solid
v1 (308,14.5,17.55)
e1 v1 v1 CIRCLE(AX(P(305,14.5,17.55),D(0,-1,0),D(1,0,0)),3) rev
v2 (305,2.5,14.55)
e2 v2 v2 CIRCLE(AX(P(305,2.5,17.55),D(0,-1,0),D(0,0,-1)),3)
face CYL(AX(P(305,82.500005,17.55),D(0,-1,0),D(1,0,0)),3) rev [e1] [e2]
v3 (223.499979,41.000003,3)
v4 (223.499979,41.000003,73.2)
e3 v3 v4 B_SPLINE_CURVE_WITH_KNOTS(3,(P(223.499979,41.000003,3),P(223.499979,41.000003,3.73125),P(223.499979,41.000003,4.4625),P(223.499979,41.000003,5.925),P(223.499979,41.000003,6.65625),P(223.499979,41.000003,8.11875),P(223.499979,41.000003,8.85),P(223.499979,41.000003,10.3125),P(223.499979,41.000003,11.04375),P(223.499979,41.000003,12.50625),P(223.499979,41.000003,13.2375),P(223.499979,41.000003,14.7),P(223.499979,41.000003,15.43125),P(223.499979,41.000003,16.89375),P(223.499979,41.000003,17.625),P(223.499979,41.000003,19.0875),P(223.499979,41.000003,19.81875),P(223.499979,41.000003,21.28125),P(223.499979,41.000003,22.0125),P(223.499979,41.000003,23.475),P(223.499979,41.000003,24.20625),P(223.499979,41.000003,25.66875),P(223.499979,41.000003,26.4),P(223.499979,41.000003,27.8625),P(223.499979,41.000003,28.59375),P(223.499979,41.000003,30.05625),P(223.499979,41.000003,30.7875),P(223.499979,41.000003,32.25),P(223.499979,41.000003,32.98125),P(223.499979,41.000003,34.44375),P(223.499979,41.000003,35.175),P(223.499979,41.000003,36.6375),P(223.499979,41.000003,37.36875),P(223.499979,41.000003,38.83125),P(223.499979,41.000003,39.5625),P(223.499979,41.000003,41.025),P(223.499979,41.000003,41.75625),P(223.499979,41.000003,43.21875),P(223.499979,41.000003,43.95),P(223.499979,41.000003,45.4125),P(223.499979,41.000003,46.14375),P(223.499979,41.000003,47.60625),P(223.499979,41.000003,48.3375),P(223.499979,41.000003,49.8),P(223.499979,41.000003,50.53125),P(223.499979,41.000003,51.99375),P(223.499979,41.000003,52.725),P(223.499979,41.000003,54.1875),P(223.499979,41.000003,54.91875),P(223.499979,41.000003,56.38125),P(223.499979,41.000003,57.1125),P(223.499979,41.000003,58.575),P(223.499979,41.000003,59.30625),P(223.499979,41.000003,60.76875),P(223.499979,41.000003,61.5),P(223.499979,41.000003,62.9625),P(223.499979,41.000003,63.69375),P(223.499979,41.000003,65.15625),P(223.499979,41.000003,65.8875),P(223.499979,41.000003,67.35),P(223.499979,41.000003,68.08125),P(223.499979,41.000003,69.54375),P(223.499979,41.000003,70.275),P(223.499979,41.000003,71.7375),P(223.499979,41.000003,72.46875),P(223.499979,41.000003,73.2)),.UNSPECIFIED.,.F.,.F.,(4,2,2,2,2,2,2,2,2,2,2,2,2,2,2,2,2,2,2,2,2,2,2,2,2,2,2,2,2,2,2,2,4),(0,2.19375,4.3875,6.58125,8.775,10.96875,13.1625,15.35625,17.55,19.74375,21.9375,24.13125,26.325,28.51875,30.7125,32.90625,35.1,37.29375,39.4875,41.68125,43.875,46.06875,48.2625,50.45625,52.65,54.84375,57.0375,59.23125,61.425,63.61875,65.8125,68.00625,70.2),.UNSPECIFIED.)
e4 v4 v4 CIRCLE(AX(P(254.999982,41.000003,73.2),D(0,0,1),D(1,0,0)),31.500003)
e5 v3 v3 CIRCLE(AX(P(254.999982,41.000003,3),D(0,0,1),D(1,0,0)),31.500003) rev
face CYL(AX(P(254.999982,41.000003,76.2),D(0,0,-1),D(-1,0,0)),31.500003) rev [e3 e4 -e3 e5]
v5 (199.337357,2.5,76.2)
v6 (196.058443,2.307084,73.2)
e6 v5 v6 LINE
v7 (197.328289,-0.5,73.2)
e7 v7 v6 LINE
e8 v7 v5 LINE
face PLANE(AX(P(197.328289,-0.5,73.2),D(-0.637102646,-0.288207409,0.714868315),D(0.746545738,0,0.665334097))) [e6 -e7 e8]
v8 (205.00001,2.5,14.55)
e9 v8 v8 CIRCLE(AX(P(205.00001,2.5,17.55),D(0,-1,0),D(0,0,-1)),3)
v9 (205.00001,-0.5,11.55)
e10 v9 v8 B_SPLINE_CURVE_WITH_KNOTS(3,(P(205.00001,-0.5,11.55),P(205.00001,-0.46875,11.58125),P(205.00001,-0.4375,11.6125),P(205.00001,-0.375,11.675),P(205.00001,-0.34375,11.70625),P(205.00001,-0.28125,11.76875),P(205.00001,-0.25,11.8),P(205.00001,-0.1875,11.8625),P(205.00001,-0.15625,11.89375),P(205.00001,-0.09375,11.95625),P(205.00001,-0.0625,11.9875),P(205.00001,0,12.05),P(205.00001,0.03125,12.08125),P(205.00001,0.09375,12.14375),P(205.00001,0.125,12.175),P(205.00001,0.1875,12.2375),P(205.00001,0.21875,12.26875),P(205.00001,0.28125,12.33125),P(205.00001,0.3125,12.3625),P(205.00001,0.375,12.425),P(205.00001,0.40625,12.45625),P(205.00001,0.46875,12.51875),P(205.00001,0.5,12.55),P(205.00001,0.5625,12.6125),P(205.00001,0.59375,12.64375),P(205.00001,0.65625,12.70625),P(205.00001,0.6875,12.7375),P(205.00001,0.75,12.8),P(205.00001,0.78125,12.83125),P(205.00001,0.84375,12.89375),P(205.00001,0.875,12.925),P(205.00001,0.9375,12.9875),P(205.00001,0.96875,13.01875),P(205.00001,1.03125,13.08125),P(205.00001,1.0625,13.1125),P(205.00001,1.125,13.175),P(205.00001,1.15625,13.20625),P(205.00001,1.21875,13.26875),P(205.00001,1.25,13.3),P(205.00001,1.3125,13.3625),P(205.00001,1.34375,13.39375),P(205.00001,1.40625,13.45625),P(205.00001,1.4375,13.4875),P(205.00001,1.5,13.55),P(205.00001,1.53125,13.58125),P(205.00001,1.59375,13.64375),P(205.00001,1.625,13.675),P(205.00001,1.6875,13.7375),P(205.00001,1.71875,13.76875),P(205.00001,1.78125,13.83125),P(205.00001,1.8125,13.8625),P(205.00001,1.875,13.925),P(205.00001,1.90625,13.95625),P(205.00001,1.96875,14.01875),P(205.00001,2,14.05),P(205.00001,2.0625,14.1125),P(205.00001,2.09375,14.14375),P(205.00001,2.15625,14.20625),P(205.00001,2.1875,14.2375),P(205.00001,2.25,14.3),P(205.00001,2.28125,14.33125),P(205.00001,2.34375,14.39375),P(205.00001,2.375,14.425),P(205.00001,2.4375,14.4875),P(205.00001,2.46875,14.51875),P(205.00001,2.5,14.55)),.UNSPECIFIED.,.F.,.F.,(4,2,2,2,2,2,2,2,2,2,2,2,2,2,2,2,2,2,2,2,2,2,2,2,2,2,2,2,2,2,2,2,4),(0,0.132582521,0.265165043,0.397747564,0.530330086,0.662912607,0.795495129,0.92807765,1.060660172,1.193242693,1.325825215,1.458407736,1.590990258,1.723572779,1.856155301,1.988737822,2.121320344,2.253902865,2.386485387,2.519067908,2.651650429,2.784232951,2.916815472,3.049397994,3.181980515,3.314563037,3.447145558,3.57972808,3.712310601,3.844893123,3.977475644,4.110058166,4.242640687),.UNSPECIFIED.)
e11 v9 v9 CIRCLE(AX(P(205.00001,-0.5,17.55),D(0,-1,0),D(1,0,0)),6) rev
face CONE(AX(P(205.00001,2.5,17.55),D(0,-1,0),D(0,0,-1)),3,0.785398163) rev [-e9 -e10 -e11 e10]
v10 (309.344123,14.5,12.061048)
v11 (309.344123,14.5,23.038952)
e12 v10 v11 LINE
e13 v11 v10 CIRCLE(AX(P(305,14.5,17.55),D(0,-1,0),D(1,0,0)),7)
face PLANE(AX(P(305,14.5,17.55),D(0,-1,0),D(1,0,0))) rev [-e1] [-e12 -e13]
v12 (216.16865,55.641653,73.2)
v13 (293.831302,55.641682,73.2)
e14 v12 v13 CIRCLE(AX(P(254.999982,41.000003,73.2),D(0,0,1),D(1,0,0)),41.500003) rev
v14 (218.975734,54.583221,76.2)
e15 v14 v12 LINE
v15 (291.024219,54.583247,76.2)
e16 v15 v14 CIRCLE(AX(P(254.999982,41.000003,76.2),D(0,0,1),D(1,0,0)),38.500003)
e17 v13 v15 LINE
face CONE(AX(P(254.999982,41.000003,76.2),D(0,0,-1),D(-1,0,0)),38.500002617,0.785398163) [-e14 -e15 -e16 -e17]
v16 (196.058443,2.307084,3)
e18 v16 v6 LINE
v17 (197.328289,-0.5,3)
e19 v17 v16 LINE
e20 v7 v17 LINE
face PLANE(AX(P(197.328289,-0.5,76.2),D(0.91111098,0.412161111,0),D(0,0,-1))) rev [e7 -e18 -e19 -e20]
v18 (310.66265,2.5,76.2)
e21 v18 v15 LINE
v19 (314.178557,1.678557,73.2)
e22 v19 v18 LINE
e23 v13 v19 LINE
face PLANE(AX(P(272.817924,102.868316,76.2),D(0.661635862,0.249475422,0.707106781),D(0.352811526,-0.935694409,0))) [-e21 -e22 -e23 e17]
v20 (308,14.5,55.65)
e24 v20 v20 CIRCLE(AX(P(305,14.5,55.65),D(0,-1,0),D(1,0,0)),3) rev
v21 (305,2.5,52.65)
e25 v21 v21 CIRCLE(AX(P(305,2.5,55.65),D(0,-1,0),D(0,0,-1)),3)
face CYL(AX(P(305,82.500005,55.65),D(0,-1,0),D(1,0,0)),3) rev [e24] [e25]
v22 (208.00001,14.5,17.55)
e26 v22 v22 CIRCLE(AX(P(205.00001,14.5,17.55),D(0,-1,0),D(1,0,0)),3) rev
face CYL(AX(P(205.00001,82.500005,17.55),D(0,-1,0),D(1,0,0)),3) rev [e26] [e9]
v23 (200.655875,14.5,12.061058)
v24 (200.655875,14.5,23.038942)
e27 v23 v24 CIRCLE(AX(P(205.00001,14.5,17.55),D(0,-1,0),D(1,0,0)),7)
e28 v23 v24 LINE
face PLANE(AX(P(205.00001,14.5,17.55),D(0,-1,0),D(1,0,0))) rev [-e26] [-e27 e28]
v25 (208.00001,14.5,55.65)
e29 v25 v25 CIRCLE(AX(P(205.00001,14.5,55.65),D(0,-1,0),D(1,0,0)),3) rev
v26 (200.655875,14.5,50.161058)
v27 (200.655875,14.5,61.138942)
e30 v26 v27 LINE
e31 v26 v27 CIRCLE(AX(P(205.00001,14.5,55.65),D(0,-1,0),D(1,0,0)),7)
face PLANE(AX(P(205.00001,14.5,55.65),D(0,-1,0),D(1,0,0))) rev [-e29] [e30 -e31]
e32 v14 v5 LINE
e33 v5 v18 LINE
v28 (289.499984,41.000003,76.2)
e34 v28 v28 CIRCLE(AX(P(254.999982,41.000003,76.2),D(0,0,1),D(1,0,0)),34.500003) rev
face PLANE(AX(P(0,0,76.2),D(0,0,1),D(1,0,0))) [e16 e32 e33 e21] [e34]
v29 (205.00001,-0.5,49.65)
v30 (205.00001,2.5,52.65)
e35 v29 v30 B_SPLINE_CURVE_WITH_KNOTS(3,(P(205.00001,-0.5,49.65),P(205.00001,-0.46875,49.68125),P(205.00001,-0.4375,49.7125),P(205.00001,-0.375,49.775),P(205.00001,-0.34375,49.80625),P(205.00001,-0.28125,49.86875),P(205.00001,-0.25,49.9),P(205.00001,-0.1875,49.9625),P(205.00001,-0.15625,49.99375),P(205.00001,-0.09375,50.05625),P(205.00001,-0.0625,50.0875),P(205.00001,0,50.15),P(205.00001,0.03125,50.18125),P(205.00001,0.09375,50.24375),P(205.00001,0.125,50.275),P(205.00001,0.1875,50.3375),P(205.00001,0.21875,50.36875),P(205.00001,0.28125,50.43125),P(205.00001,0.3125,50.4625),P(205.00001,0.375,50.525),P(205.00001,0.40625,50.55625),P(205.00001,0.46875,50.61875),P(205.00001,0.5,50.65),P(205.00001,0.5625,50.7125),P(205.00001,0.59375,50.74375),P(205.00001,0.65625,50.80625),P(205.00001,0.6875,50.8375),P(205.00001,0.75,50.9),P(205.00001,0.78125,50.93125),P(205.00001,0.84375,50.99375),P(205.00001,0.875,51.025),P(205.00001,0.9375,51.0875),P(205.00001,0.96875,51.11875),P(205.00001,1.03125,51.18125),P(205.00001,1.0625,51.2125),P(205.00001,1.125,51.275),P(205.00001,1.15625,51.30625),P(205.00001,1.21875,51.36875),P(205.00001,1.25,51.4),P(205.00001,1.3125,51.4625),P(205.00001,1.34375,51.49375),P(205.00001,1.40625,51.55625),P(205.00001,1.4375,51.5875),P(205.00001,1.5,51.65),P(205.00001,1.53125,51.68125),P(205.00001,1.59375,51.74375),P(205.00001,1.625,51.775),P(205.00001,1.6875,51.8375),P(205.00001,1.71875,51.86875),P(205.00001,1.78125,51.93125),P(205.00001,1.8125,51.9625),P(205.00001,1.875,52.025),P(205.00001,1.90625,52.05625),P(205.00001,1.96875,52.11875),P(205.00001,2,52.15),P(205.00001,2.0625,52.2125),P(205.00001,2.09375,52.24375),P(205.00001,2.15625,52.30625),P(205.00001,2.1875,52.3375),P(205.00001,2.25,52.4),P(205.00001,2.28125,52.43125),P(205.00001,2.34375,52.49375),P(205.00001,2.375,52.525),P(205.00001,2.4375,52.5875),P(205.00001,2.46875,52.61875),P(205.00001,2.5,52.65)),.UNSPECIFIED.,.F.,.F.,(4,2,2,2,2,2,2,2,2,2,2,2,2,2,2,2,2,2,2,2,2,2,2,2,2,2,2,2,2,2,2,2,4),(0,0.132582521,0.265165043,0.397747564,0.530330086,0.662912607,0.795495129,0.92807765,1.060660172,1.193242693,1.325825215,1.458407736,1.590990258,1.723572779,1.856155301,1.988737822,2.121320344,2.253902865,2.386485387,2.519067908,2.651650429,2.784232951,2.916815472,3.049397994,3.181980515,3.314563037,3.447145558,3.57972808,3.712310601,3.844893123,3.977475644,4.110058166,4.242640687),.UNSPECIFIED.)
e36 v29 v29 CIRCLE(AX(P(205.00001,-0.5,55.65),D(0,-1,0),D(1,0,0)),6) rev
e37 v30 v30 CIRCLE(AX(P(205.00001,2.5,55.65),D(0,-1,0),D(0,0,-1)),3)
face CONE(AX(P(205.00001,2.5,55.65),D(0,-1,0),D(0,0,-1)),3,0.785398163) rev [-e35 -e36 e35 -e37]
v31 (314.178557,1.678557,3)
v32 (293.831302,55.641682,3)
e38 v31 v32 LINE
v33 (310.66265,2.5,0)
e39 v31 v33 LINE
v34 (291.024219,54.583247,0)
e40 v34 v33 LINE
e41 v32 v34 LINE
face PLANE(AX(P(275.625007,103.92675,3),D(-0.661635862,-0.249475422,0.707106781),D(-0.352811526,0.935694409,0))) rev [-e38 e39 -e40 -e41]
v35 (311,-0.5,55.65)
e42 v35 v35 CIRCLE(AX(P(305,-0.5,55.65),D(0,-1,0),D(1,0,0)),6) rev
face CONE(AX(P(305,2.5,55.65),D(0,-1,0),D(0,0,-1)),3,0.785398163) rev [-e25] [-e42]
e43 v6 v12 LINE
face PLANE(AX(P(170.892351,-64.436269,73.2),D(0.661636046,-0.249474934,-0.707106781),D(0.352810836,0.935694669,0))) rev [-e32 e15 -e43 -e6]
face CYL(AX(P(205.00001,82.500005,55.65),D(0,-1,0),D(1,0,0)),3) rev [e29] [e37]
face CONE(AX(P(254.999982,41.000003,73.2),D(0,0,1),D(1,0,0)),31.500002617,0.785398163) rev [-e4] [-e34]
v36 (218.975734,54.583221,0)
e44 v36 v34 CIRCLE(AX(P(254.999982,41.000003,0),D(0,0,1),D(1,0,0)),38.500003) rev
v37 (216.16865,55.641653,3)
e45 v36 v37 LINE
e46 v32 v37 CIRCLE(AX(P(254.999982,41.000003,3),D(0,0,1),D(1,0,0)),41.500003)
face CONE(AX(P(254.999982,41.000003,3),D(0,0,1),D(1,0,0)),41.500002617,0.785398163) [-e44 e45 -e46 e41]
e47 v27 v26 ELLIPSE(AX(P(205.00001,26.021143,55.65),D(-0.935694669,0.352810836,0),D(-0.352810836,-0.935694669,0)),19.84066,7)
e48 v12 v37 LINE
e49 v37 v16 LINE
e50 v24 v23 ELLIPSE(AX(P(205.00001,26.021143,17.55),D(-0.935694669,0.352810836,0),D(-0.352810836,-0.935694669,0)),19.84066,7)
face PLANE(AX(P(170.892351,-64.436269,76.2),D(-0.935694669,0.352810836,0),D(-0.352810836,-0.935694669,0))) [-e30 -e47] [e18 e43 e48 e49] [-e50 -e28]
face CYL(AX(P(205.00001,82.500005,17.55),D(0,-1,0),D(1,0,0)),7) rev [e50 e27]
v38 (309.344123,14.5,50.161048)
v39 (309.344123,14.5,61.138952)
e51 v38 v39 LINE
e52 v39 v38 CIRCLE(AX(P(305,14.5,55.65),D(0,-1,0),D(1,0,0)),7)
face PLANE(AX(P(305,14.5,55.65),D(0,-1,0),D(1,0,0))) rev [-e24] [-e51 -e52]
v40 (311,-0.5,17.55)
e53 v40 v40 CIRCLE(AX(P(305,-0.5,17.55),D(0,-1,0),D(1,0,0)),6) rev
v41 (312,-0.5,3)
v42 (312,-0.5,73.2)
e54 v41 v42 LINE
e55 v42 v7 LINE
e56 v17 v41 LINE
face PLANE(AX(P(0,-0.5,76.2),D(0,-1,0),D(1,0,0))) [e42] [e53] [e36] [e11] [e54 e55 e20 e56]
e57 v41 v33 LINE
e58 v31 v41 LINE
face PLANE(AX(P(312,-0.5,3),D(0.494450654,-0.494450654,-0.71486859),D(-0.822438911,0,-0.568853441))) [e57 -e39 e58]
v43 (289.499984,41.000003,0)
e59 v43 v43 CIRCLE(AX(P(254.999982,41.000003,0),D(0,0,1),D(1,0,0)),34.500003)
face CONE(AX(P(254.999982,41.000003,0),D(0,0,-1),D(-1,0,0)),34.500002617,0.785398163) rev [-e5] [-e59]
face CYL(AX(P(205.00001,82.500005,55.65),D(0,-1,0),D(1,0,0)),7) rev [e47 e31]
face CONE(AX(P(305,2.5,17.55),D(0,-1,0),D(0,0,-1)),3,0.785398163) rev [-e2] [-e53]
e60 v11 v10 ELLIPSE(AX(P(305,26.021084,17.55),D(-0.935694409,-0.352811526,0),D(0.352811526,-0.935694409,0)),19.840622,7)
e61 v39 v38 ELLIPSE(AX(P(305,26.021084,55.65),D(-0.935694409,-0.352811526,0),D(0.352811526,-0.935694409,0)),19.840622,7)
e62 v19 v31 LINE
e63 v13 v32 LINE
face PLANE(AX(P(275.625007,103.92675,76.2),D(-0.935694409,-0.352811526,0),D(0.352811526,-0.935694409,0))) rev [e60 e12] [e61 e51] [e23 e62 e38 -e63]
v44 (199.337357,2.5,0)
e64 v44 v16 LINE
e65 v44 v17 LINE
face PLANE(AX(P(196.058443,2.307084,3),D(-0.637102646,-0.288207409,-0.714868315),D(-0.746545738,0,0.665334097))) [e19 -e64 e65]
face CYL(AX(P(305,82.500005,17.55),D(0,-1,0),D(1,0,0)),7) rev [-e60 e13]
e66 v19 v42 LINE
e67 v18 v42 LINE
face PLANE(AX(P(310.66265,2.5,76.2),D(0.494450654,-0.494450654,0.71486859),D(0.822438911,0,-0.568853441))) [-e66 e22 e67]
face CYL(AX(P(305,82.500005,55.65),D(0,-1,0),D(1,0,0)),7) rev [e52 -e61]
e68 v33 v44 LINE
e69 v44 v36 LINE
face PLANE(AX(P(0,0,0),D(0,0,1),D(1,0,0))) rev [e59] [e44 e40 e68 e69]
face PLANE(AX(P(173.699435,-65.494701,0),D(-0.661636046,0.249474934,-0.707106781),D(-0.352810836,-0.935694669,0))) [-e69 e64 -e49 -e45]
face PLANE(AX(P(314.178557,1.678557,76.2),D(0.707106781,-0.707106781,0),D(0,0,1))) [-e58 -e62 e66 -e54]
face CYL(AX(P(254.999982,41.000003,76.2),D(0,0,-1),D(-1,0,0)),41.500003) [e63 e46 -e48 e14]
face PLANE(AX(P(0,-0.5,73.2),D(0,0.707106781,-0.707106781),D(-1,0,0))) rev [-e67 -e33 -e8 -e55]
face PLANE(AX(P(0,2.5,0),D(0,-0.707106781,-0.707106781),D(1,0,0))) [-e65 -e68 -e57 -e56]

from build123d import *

# Parameters (mm, degrees)
SKETCH1_R           = 31.500002617
BOSS_EXTRUDE1_DEPTH = 76.2
SKETCH2_R           = 3
CUT_EXTRUDE1_DEPTH  = 335.545125332
SKETCH3_R           = 7
CUT_EXTRUDE2_DEPTH  = 332.142628978


with BuildPart() as part:
    # Sketch1 → Boss-Extrude1 (new body)
    with BuildSketch(Plane.XY):
        with BuildLine():
            Line((254.999981536, -0.500000028), (315.000000023, -0.500000028))
            Line((315.000000023, -0.500000028), (293.831301967, 55.641681824))
            ThreePointArc((293.831301967, 55.641681824), (254.99996624, 82.500005207), (216.168650312, 55.6416532))
            Line((216.168650312, 55.6416532), (195.000010316, -0.500000028))
            Line((195.000010316, -0.500000028), (254.999981536, -0.500000028))
        make_face()
        with Locations(Location((254.999981536, 41.00000259, 0), (0, 0, 180))):
            Circle(SKETCH1_R, mode=Mode.SUBTRACT)
    extrude(amount=BOSS_EXTRUDE1_DEPTH)

    # Sketch2 → Cut-Extrude1 (cut, through all)
    with BuildSketch(Plane.XZ.offset(0.500000028)):
        with Locations((205.000010316, 55.65)):
            Circle(SKETCH2_R)
        with Locations((205.000010316, 17.55)):
            Circle(SKETCH2_R)
        with Locations((305.000000023, 17.55)):
            Circle(SKETCH2_R)
        with Locations((305.000000023, 55.65)):
            Circle(SKETCH2_R)
    extrude(amount=-CUT_EXTRUDE1_DEPTH, mode=Mode.SUBTRACT)

    # Sketch3 → Cut-Extrude2 (cut, through all)
    with BuildSketch(Plane(origin=(0, 14.499999972, 0), x_dir=(-1, 0, 0), z_dir=(0, -1, 0))):
        with Locations((-205.000010316, -55.65)):
            Circle(SKETCH3_R)
        with Locations((-205.000010316, -17.55)):
            Circle(SKETCH3_R)
        with Locations((-305.000000023, -17.55)):
            Circle(SKETCH3_R)
        with Locations((-305.000000023, -55.65)):
            Circle(SKETCH3_R)
    extrude(amount=-CUT_EXTRUDE2_DEPTH, mode=Mode.SUBTRACT)

    # Chamfer1
    # the kernel refuses this chamfer: 3, 2.32827876, 2.328277984 mm, written as the material it takes off along each edge
    with BuildSketch(Plane(origin=(312.2804021, 1.226185537, 2), x_dir=(0.7489750456743214, -0.1749877092594348, 0.6390740822199596), z_dir=(0.49445065392204135, -0.49445065392203297, -0.7148685904920845))) as chamfer1_piece_1:
        Polygon((-2.712706316, -0.938589866), (1.981585134, -0.938589866), (0.731121181, 1.877179732), align=None)
    extrude(amount=3.990753507, mode=Mode.SUBTRACT)
    with BuildSketch(Plane(origin=(312.2804021, 1.226185537, 74.2), x_dir=(0.7489750456743212, -0.17498770925943466, -0.6390740822199599), z_dir=(0.49445065392204157, -0.4944506539220329, 0.7148685904920844))) as chamfer1_piece_2:
        Polygon((-2.712706316, 0.938589866), (1.981585134, 0.938589866), (0.731121181, -1.877179732), align=None)
    extrude(amount=3.990753507, mode=Mode.SUBTRACT)
    with BuildSketch(Plane(origin=(197.57469642, 1.435694642, 2), x_dir=(-0.7370953833685595, -0.043367244138400055, 0.6743957873182457), z_dir=(-0.6371026460751021, -0.2882074086415896, -0.7148683151239834))) as chamfer1_piece_3:
        Polygon((-2.694196805, 0.990466053), (1.754229559, 0.990466053), (0.939967246, -1.980932106), align=None)
    extrude(amount=3.990753255, mode=Mode.SUBTRACT)
    with BuildSketch(Plane(origin=(197.57469642, 1.435694642, 74.2), x_dir=(0.4121611112794653, -0.9111109802591978, 0), z_dir=(-0.637102646075102, -0.2882074086415896, 0.7148683151239834))) as chamfer1_piece_4:
        Polygon((-1.418873162, -1.430085067), (1.662073143, -1.430085067), (-0.243199981, 2.860170134), align=None)
    extrude(amount=3.990753255, mode=Mode.SUBTRACT)
    with BuildSketch(Plane(origin=(315.000000023, -0.500000028, -7.715048964), x_dir=(-0.9996219169112968, -0.027495876610586858, 0), z_dir=(0, 0, 1))) as chamfer1_piece_5:
        with BuildLine():
            Line((3.086019586, 0), (0.674077573, -2.282806951))
            Line((0.674077573, -2.282806951), (0.617375083, -2.302423975))
            ThreePointArc((0.617375083, -2.302423975), (0.331998575, -1.143147207), (-0.05670249, -0.019617024))
            Line((-0.05670249, -0.019617024), (0.001649753, 0.059977315))
            ThreePointArc((0.001649753, 0.059977315), (1.543492994, 0.017566949), (3.087669338, 0.059977315))
            Line((3.087669338, 0.059977315), (3.086019586, 0))
        make_face()
    extrude(amount=91.630097928, mode=Mode.SUBTRACT)
    with BuildSketch(Plane(origin=(195.000010316, -0.500000028, -7.715048964), x_dir=(0.9989444981358719, -0.04593353507048098, 0), z_dir=(0, 0, 1))) as chamfer1_piece_6:
        with BuildLine():
            Line((2.380250452, 0), (0.873946844, 2.959684746))
            Line((0.873946844, 2.959684746), (0.81689207, 2.978252267))
            ThreePointArc((0.81689207, 2.978252267), (0.420262466, 1.485280674), (-0.057054773, 0.018567521))
            Line((-0.057054773, 0.018567521), (0.002756012, -0.05993667))
            ThreePointArc((0.002756012, -0.05993667), (1.190370205, -0.005327712), (2.383006464, -0.05993667))
            Line((2.383006464, -0.05993667), (2.380250452, 0))
        make_face()
    extrude(amount=91.630097928, mode=Mode.SUBTRACT)
    with BuildSketch(Plane(origin=(317.721958218, -7.71892821, 76.2), x_dir=(-0.9353406389810182, -0.3526781334871724, 0.027495876610586882), z_dir=(-0.3528115255584857, 0.9356944092133361, 0))) as chamfer1_piece_7:
        with BuildLine():
            Line((3.086019586, 0), (-0.169641465, -3.081353381))
            Line((-0.169641465, -3.081353381), (-0.22961878, -3.079703628))
            ThreePointArc((-0.22961878, -3.079703628), (-0.102387681, -1.540193489), (-0.059977315, 0.001649753))
            Line((-0.059977315, 0.001649753), (0.001649753, 0.059977315))
            ThreePointArc((0.001649753, 0.059977315), (1.543492994, 0.017566949), (3.087669338, 0.059977315))
            Line((3.087669338, 0.059977315), (3.086019586, 0))
        make_face()
    extrude(amount=67.715067451, mode=Mode.SUBTRACT)
    with BuildSketch(Plane(origin=(254.999981536, 41.00000259, 76.2), x_dir=(0.9356944092133357, 0.3528115255584864, 0), z_dir=(0.3528115255584864, -0.9356944092133357, 0))) as chamfer1_piece_8:
        with BuildLine():
            Line((41.584855431, -3.084852814), (38.415149803, 0.084852814))
            Line((38.415149803, 0.084852814), (38.415149803, 0.144852814))
            ThreePointArc((38.415149803, 0.144852814), (39.95757621, 0.06), (41.500002617, 0.06))
            Line((41.500002617, 0.06), (41.560002617, 0))
            ThreePointArc((41.560002617, 0), (41.560002617, -1.542426407), (41.644855431, -3.084852814))
            Line((41.644855431, -3.084852814), (41.584855431, -3.084852814))
        make_face()
    revolve(axis=Axis((254.999981536, 41.00000259, 76.2), (0, 0, 1)), revolution_arc=138.681287603, mode=Mode.SUBTRACT)
    with BuildSketch(Plane(origin=(216.168650312, 55.6416532, 76.2), x_dir=(0.9353408989512485, -0.3526774440171723, 0.027495876610586775), z_dir=(-0.35281083582771006, -0.9356946692818939, 0))) as chamfer1_piece_9:
        with BuildLine():
            Line((3.086019586, 0), (-0.169641465, -3.081353381))
            Line((-0.169641465, -3.081353381), (-0.22961878, -3.079703628))
            ThreePointArc((-0.22961878, -3.079703628), (-0.102387681, -1.540193489), (-0.059977315, 0.001649753))
            Line((-0.059977315, 0.001649753), (0.001649753, 0.059977315))
            ThreePointArc((0.001649753, 0.059977315), (1.543492994, 0.017566949), (3.087669338, 0.059977315))
            Line((3.087669338, 0.059977315), (3.086019586, 0))
        make_face()
    extrude(amount=67.715020184, mode=Mode.SUBTRACT)
    with BuildSketch(Plane(origin=(305.000000023, -0.500000028, 55.65), x_dir=(1, 0, 0), z_dir=(0, 0, -1))) as chamfer1_piece_10:
        with BuildLine():
            Line((6.084852814, 0.084852814), (2.915147186, -3.084852814))
            Line((2.915147186, -3.084852814), (2.855147186, -3.084852814))
            ThreePointArc((2.855147186, -3.084852814), (2.94, -1.542426407), (2.94, 0))
            Line((2.94, 0), (3, 0.06))
            ThreePointArc((3, 0.06), (4.542426407, 0.06), (6.084852814, 0.144852814))
            Line((6.084852814, 0.144852814), (6.084852814, 0.084852814))
        make_face()
    revolve(axis=Axis((305.000000023, -0.500000028, 55.65), (0, -1, 0)), mode=Mode.SUBTRACT)
    with BuildSketch(Plane(origin=(305.000000023, -0.500000028, 17.55), x_dir=(1, 0, 0), z_dir=(0, 0, -1))) as chamfer1_piece_11:
        with BuildLine():
            Line((6.084852814, 0.084852814), (2.915147186, -3.084852814))
            Line((2.915147186, -3.084852814), (2.855147186, -3.084852814))
            ThreePointArc((2.855147186, -3.084852814), (2.94, -1.542426407), (2.94, 0))
            Line((2.94, 0), (3, 0.06))
            ThreePointArc((3, 0.06), (4.542426407, 0.06), (6.084852814, 0.144852814))
            Line((6.084852814, 0.144852814), (6.084852814, 0.084852814))
        make_face()
    revolve(axis=Axis((305.000000023, -0.500000028, 17.55), (0, -1, 0)), mode=Mode.SUBTRACT)
    with BuildSketch(Plane(origin=(322.715048987, -0.500000028, 76.2), x_dir=(0, 0.9996219169112968, 0.027495876610586778), z_dir=(-1, 0, 0))) as chamfer1_piece_12:
        with BuildLine():
            Line((3.086019586, 0), (-0.169641465, 3.081353381))
            Line((-0.169641465, 3.081353381), (-0.22961878, 3.079703628))
            ThreePointArc((-0.22961878, 3.079703628), (-0.102387681, 1.540193489), (-0.059977315, -0.001649753))
            Line((-0.059977315, -0.001649753), (0.001649753, -0.059977315))
            ThreePointArc((0.001649753, -0.059977315), (1.543492994, -0.017566949), (3.087669338, -0.059977315))
            Line((3.087669338, -0.059977315), (3.086019586, 0))
        make_face()
    extrude(amount=135.430087635, mode=Mode.SUBTRACT)
    with BuildSketch(Plane(origin=(205.000010316, -0.500000028, 17.55), x_dir=(1, 0, 0), z_dir=(0, 0, -1))) as chamfer1_piece_13:
        with BuildLine():
            Line((6.084852814, 0.084852814), (2.915147186, -3.084852814))
            Line((2.915147186, -3.084852814), (2.855147186, -3.084852814))
            ThreePointArc((2.855147186, -3.084852814), (2.94, -1.542426407), (2.94, 0))
            Line((2.94, 0), (3, 0.06))
            ThreePointArc((3, 0.06), (4.542426407, 0.06), (6.084852814, 0.144852814))
            Line((6.084852814, 0.144852814), (6.084852814, 0.084852814))
        make_face()
    revolve(axis=Axis((205.000010316, -0.500000028, 17.55), (0, -1, 0)), mode=Mode.SUBTRACT)
    with BuildSketch(Plane(origin=(205.000010316, -0.500000028, 55.65), x_dir=(1, 0, 0), z_dir=(0, 0, -1))) as chamfer1_piece_14:
        with BuildLine():
            Line((6.084852814, 0.084852814), (2.915147186, -3.084852814))
            Line((2.915147186, -3.084852814), (2.855147186, -3.084852814))
            ThreePointArc((2.855147186, -3.084852814), (2.94, -1.542426407), (2.94, 0))
            Line((2.94, 0), (3, 0.06))
            ThreePointArc((3, 0.06), (4.542426407, 0.06), (6.084852814, 0.144852814))
            Line((6.084852814, 0.144852814), (6.084852814, 0.084852814))
        make_face()
    revolve(axis=Axis((205.000010316, -0.500000028, 55.65), (0, -1, 0)), mode=Mode.SUBTRACT)
    with BuildSketch(Plane(origin=(254.999981536, 41.00000259, 76.2), x_dir=(-1, 0, 0), z_dir=(0, 1, 0))) as chamfer1_piece_15:
        with BuildLine():
            Line((34.584855431, 0.084852814), (31.415149803, -3.084852814))
            Line((31.415149803, -3.084852814), (31.355149803, -3.084852814))
            ThreePointArc((31.355149803, -3.084852814), (31.440002617, -1.542426407), (31.440002617, 0))
            Line((31.440002617, 0), (31.500002617, 0.06))
            ThreePointArc((31.500002617, 0.06), (33.042429024, 0.06), (34.584855431, 0.144852814))
            Line((34.584855431, 0.144852814), (34.584855431, 0.084852814))
        make_face()
    revolve(axis=Axis((254.999981536, 41.00000259, 76.2), (0, 0, 1)), mode=Mode.SUBTRACT)
    with BuildSketch(Plane(origin=(187.284961352, -0.500000028, 0), x_dir=(0, -0.027495876610586382, 0.9996219169112968), z_dir=(1, 0, 0))) as chamfer1_piece_16:
        with BuildLine():
            Line((3.086019586, 0), (-0.169641465, -3.081353381))
            Line((-0.169641465, -3.081353381), (-0.22961878, -3.079703628))
            ThreePointArc((-0.22961878, -3.079703628), (-0.102387681, -1.540193489), (-0.059977315, 0.001649753))
            Line((-0.059977315, 0.001649753), (0.001649753, 0.059977315))
            ThreePointArc((0.001649753, 0.059977315), (1.543492994, 0.017566949), (3.087669338, 0.059977315))
            Line((3.087669338, 0.059977315), (3.086019586, 0))
        make_face()
    extrude(amount=135.430087635, mode=Mode.SUBTRACT)
    with BuildSketch(Plane(origin=(216.168650312, 55.6416532, 0), x_dir=(0.9353408989512486, -0.3526774440171724, -0.027495876610586396), z_dir=(-0.35281083582771006, -0.9356946692818939, 0))) as chamfer1_piece_17:
        with BuildLine():
            Line((3.086019586, 0), (-0.169641465, 3.081353381))
            Line((-0.169641465, 3.081353381), (-0.22961878, 3.079703628))
            ThreePointArc((-0.22961878, 3.079703628), (-0.102387681, 1.540193489), (-0.059977315, -0.001649753))
            Line((-0.059977315, -0.001649753), (0.001649753, -0.059977315))
            ThreePointArc((0.001649753, -0.059977315), (1.543492994, -0.017566949), (3.087669338, -0.059977315))
            Line((3.087669338, -0.059977315), (3.086019586, 0))
        make_face()
    extrude(amount=67.715020184, mode=Mode.SUBTRACT)
    with BuildSketch(Plane(origin=(254.999981536, 41.00000259, 0), x_dir=(0.9356944092133357, 0.3528115255584864, 0), z_dir=(0.3528115255584864, -0.9356944092133357, 0))) as chamfer1_piece_18:
        with BuildLine():
            Line((41.584855431, 3.084852814), (38.415149803, -0.084852814))
            Line((38.415149803, -0.084852814), (38.415149803, -0.144852814))
            ThreePointArc((38.415149803, -0.144852814), (39.95757621, -0.06), (41.500002617, -0.06))
            Line((41.500002617, -0.06), (41.560002617, 0))
            ThreePointArc((41.560002617, 0), (41.560002617, 1.542426407), (41.644855431, 3.084852814))
            Line((41.644855431, 3.084852814), (41.584855431, 3.084852814))
        make_face()
    revolve(axis=Axis((254.999981536, 41.00000259, 0), (0, 0, 1)), revolution_arc=138.681287603, mode=Mode.SUBTRACT)
    with BuildSketch(Plane(origin=(317.721958218, -7.71892821, 0), x_dir=(-0.9353406389810183, -0.3526781334871725, -0.02749587661058642), z_dir=(-0.3528115255584857, 0.9356944092133361, 0))) as chamfer1_piece_19:
        with BuildLine():
            Line((3.086019586, 0), (-0.169641465, 3.081353381))
            Line((-0.169641465, 3.081353381), (-0.22961878, 3.079703628))
            ThreePointArc((-0.22961878, 3.079703628), (-0.102387681, 1.540193489), (-0.059977315, -0.001649753))
            Line((-0.059977315, -0.001649753), (0.001649753, -0.059977315))
            ThreePointArc((0.001649753, -0.059977315), (1.543492994, -0.017566949), (3.087669338, -0.059977315))
            Line((3.087669338, -0.059977315), (3.086019586, 0))
        make_face()
    extrude(amount=67.715067451, mode=Mode.SUBTRACT)
    with BuildSketch(Plane(origin=(254.999981536, 41.00000259, 0), x_dir=(-1, 0, 0), z_dir=(0, 1, 0))) as chamfer1_piece_20:
        with BuildLine():
            Line((31.415149803, 3.084852814), (34.584855431, -0.084852814))
            Line((34.584855431, -0.084852814), (34.584855431, -0.144852814))
            ThreePointArc((34.584855431, -0.144852814), (33.042429024, -0.06), (31.500002617, -0.06))
            Line((31.500002617, -0.06), (31.440002617, 0))
            ThreePointArc((31.440002617, 0), (31.440002617, 1.542426407), (31.355149803, 3.084852814))
            Line((31.355149803, 3.084852814), (31.415149803, 3.084852814))
        make_face()
    revolve(axis=Axis((254.999981536, 41.00000259, 0), (0, 0, 1)), mode=Mode.SUBTRACT)


solid = part.part
